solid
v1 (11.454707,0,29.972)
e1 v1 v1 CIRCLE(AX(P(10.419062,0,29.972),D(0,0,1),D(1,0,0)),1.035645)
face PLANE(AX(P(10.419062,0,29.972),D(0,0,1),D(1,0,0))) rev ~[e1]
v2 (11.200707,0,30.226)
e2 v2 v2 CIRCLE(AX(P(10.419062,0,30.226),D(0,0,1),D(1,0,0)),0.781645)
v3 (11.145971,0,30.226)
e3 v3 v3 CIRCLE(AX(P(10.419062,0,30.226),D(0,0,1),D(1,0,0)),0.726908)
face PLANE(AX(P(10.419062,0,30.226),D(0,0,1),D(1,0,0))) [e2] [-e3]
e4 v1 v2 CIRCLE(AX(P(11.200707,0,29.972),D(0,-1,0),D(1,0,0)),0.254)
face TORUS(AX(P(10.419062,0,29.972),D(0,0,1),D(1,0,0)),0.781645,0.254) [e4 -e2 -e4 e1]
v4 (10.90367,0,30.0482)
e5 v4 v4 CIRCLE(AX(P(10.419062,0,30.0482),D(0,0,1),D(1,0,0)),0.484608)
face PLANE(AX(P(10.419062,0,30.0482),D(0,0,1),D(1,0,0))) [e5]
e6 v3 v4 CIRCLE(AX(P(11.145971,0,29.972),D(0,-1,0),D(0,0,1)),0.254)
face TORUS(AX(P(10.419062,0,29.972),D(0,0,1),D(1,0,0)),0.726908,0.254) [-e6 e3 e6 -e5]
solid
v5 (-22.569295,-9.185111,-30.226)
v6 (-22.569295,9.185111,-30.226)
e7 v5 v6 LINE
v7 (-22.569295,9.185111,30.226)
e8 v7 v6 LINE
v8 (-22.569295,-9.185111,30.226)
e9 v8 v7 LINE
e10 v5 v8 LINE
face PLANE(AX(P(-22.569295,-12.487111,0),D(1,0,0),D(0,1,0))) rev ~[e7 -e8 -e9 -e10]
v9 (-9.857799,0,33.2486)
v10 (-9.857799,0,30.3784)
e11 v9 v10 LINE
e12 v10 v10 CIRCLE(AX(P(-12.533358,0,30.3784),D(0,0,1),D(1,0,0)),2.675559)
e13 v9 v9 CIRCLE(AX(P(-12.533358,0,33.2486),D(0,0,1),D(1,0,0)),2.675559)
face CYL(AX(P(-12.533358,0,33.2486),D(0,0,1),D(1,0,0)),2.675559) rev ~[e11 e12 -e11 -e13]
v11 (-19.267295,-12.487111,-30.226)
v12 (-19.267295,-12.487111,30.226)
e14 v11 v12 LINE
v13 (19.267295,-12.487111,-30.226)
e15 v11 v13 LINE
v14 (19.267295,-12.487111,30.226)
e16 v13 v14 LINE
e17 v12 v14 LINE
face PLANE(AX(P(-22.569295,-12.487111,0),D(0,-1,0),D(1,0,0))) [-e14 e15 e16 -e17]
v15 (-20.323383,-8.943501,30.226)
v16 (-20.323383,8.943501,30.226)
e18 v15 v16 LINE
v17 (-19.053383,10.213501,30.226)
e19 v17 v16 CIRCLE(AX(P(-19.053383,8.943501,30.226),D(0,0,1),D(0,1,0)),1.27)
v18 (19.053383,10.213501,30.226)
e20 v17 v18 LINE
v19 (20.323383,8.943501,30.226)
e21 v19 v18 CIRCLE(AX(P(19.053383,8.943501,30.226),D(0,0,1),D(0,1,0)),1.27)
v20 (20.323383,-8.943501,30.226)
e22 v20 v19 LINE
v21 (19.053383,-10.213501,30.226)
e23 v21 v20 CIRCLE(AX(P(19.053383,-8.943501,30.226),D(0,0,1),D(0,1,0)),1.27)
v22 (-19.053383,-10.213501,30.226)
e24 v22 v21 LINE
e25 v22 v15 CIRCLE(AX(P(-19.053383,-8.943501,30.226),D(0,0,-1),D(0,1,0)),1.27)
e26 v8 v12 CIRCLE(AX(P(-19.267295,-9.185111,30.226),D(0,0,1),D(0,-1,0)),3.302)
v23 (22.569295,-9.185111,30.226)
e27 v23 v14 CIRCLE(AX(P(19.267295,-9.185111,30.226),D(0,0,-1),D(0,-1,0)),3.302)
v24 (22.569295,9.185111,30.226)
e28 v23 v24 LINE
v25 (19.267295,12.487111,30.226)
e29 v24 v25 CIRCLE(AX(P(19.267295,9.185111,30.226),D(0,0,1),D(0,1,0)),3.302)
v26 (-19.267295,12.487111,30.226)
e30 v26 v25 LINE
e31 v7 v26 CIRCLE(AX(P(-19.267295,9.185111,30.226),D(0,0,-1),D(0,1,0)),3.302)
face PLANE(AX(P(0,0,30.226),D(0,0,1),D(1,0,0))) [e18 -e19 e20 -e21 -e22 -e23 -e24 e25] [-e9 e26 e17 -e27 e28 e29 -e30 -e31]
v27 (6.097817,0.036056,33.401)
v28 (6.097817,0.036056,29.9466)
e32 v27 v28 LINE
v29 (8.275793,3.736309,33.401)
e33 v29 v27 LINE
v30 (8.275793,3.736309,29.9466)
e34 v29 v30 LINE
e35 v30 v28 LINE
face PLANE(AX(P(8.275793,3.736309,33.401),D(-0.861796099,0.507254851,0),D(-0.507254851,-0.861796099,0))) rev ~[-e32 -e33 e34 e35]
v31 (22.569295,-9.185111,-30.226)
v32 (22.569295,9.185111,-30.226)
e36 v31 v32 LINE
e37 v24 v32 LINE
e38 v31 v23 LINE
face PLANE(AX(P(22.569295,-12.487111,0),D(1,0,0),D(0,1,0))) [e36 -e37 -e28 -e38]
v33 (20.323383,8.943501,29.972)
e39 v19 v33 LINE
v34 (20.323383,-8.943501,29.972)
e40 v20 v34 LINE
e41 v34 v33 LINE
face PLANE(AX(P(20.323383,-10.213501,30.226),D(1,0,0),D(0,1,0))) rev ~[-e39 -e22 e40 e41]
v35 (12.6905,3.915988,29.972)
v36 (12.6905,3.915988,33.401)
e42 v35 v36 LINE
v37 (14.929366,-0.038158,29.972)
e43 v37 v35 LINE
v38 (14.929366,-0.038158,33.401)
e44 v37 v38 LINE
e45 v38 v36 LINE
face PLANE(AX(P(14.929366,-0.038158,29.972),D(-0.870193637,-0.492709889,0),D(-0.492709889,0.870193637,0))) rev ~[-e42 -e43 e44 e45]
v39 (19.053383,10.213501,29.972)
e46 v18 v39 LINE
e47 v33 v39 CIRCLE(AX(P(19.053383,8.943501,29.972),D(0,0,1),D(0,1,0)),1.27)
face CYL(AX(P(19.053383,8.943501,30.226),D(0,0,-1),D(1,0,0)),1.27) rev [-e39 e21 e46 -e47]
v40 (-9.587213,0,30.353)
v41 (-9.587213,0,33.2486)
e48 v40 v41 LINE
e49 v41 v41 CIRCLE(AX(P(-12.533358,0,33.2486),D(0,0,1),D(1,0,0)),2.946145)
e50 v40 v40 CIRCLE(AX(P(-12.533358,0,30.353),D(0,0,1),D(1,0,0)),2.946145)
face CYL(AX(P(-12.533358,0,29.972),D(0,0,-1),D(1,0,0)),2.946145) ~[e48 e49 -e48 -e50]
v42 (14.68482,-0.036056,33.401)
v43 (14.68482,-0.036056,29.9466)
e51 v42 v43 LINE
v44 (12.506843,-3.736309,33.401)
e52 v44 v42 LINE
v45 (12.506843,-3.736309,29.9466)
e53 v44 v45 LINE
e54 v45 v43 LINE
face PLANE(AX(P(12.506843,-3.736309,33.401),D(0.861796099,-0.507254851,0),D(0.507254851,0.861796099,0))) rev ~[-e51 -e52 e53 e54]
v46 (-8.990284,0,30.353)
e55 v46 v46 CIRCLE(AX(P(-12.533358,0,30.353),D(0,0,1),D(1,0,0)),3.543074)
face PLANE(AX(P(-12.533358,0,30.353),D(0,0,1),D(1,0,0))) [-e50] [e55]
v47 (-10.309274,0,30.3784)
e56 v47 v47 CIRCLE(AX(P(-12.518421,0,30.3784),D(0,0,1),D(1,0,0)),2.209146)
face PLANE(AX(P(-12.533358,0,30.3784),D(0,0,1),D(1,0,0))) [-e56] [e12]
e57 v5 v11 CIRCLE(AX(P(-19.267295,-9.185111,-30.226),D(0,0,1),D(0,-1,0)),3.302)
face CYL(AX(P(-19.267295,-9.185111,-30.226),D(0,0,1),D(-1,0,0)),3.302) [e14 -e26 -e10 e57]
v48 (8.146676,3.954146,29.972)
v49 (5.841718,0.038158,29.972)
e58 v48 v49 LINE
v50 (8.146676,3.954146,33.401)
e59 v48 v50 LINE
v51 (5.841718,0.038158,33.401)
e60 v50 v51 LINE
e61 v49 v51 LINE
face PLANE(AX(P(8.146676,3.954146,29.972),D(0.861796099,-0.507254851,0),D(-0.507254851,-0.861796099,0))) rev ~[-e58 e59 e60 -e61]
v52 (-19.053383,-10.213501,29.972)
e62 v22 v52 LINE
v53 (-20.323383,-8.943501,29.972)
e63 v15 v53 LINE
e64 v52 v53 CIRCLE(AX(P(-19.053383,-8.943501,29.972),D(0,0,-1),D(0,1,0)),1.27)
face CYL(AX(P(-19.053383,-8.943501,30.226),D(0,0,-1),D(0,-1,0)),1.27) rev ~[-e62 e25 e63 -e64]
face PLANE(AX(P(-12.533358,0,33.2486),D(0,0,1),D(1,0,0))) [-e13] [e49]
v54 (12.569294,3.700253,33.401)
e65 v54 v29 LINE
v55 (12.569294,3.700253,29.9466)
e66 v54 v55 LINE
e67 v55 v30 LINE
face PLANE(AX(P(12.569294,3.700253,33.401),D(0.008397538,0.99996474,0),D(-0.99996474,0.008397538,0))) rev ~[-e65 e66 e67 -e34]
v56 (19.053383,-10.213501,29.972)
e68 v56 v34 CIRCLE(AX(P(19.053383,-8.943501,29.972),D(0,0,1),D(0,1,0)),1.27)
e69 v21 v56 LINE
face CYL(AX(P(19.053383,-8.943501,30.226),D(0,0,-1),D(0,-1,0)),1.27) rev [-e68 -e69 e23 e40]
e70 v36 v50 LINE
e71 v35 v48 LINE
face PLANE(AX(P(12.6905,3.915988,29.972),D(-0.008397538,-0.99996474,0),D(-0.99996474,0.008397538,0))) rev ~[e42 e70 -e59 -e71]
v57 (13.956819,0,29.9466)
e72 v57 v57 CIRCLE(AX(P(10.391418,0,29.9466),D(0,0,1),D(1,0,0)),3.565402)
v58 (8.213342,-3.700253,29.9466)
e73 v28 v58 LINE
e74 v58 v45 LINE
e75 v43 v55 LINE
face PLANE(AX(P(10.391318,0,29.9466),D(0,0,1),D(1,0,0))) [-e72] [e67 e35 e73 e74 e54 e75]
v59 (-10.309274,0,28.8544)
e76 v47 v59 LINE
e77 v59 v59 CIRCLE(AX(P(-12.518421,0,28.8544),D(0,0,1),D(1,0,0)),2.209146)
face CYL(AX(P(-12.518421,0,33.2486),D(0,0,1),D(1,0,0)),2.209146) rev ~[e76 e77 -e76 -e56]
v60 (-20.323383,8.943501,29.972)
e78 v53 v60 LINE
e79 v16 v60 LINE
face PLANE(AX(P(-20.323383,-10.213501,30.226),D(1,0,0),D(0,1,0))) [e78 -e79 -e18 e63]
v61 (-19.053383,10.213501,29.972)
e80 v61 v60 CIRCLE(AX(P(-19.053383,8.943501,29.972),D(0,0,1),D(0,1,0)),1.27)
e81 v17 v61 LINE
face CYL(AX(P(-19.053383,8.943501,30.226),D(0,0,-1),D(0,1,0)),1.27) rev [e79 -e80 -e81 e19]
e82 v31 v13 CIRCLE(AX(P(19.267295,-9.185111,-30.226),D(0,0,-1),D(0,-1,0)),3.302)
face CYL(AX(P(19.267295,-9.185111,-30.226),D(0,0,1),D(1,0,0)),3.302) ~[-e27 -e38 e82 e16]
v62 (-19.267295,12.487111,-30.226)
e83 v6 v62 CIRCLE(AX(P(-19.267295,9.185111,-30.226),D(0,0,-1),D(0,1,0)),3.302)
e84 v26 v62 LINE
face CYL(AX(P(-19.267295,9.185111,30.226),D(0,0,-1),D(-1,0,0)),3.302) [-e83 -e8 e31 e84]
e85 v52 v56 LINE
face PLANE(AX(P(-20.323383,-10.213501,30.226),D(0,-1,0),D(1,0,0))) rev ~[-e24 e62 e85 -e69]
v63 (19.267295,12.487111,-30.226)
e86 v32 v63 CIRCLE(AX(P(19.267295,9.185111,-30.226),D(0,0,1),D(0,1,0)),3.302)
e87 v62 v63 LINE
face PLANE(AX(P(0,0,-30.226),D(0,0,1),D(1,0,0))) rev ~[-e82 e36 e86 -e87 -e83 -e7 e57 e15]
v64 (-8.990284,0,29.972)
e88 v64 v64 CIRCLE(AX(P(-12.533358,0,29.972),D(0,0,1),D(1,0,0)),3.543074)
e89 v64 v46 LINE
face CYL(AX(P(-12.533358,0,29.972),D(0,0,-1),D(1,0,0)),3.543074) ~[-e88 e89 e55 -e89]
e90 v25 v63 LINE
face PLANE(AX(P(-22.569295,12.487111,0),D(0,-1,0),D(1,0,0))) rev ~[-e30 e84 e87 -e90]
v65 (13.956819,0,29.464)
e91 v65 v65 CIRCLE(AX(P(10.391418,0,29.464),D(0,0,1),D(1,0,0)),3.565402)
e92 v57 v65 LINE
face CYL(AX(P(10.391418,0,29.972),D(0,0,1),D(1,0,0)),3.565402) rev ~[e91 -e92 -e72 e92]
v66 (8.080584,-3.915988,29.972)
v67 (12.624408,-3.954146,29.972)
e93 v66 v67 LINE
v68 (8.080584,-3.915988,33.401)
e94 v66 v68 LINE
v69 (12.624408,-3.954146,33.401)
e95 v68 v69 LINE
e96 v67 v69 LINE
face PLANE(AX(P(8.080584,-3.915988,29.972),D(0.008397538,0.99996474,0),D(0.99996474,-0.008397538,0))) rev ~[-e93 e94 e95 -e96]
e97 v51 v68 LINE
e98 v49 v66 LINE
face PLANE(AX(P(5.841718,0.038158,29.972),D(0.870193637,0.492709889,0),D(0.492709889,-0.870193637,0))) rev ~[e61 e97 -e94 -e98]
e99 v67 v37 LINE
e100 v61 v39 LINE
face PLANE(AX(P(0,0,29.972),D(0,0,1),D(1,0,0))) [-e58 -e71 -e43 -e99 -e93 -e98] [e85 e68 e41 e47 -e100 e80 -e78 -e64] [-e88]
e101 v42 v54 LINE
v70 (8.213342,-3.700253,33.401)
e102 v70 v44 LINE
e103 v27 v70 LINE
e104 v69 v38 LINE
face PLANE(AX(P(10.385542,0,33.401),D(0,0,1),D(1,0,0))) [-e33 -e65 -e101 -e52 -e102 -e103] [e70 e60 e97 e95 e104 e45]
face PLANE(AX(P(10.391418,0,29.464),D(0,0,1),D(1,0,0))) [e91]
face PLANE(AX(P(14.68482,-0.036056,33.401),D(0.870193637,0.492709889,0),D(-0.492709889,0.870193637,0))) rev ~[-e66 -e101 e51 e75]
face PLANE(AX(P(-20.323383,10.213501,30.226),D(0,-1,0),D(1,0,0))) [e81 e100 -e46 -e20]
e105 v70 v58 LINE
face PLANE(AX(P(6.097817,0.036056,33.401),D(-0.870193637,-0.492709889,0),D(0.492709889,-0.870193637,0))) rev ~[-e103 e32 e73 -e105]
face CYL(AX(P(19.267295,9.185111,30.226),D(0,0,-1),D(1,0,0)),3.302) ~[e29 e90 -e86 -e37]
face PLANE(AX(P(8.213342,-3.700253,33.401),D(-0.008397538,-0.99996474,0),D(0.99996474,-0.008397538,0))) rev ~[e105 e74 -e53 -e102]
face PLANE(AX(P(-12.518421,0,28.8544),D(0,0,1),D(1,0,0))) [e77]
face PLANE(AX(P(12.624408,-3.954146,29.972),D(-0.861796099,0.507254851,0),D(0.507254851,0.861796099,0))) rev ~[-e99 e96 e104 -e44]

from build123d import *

# Parameters (mm, degrees)
F0_W      = 45.1385900378
F0_H      = 24.9742213637
F1_DEPTH  = 30.226
F2_R      = 3.302
F3_W      = 40.6467653811
F3_H      = 20.4270016402
F4_DEPTH  = 0.254
F5_R      = 1.27
F6_R      = 2.9461453385
F7_DEPTH  = 3.2766
F6_R_2    = 3.5430744691
F8_DEPTH  = 0.381
F9_DEPTH  = 3.429
F11_DEPTH = 3.4544
F12_R     = 3.565401554
F13_DEPTH = 0.508
F14_R     = 0.4846078425
F15_DEPTH = 0.0762
F14_R_2   = 1.0356451119
F16_DEPTH = 0.254
F18_R     = 2.6755593281
F18_R_2   = 0.8351552506
F19_DEPTH = 2.8702
F20_R     = 2.2091463804
F21_DEPTH = 4.3942


# Not quite as in the source:
# - a fillet or chamfer that OpenCascade refuses, or shapes differently, is made with other operations: its cross-section is extruded or revolved along the edge and cut away or added


with BuildPart() as f1:
    # F0 (on Top) → F1 (new body, symmetric)
    with BuildSketch(Plane.XY):
        Rectangle(F0_W, F0_H)
    extrude(amount=F1_DEPTH, both=True)

    # F2
    f2_edges = [f1.edges().sort_by_distance(p)[0] for p in [
        (-22.569295, -12.487111, 0),
        (-22.569295, 12.487111, 0),
        (22.569295, -12.487111, 0),
        (22.569295, 12.487111, 0),
    ]]
    fillet(f2_edges, radius=F2_R)

    # F3 (on face) → F4 (cut)
    with BuildSketch(Plane.XY.offset(30.226)):
        Rectangle(F3_W, F3_H)
    extrude(amount=-F4_DEPTH, mode=Mode.SUBTRACT)

    # F5
    f5_edges = [f1.edges().sort_by_distance(p)[0] for p in [
        (-20.323383, 10.213501, 30.099),
        (-20.323383, -10.213501, 30.099),
        (20.323383, 10.213501, 30.099),
        (20.323383, -10.213501, 30.099),
    ]]
    fillet(f5_edges, radius=F5_R)

    # F6 (on face) → F7 (join)
    with BuildSketch(Plane.XY.offset(29.972)):
        with Locations((-12.5333582982, 0)):
            Circle(F6_R)
    extrude(amount=F7_DEPTH)

    # F6 (on face) → F8 (join)
    with BuildSketch(Plane.XY.offset(29.972)):
        with Locations((-12.5333582982, 0)):
            Circle(F6_R_2)
        with Locations((-12.5333582982, 0)):
            Circle(F6_R, mode=Mode.SUBTRACT)
    extrude(amount=F8_DEPTH)

    # F6 (on face) → F9 (join)
    with BuildSketch(Plane.XY.offset(29.972)):
        Polygon((12.6905003563, 3.9159879088), (8.1466763174, 3.9541461872), (5.8417182595, 0.0381582783), (8.0805842406, -3.9159879088), (12.6244082795, -3.9541461872), (14.9293663373, -0.0381582783), align=None)
    extrude(amount=F9_DEPTH)

    # F10 (on face) → F11 (cut)
    with BuildSketch(Plane.XY.offset(33.401)):
        Polygon((12.5692944355, 3.700253209), (8.275793058, 3.7363093193), (6.0978168617, 0.0360561103), (8.213342043, -3.700253209), (12.5068434206, -3.7363093193), (14.6848196168, -0.0360561103), align=None)
    extrude(amount=-F11_DEPTH, mode=Mode.SUBTRACT)

    # F12 (on face) → F13 (cut)
    with BuildSketch(Plane.XY.offset(29.972)):
        with Locations((10.3914178908, 0)):
            Circle(F12_R)
    extrude(amount=-F13_DEPTH, mode=Mode.SUBTRACT)

    # F18 (on face) → F19 (cut)
    with BuildSketch(Plane.XY.offset(33.2486)):
        with Locations((-12.5333582982, 0)):
            Circle(F18_R)
        with Locations((-12.5333582982, 0)):
            Circle(F18_R_2, mode=Mode.SUBTRACT)
    extrude(amount=-F19_DEPTH, mode=Mode.SUBTRACT)

    # F20 (on face) → F21 (cut)
    with BuildSketch(Plane.XY.offset(33.2486)):
        with Locations((-12.5184208155, 0)):
            Circle(F20_R)
    extrude(amount=-F21_DEPTH, mode=Mode.SUBTRACT)


with BuildPart() as f15:
    # F14 (on face) → F15 (new body)
    with BuildSketch(Plane.XY.offset(29.972)):
        with Locations((10.4190623388, 0)):
            Circle(F14_R)
    extrude(amount=F15_DEPTH)

    # F14 (on face) → F16 (join)
    with BuildSketch(Plane.XY.offset(29.972)):
        with Locations((10.4190623388, 0)):
            Circle(F14_R_2)
        with Locations((10.4190623388, 0)):
            Circle(F14_R, mode=Mode.SUBTRACT)
    extrude(amount=F16_DEPTH)

    # F17: fillet of radius 0.254 on 2 edges, made by hand

    # F17_s1 → F17_t2 (revolve, cut)
    with BuildSketch(Plane.XZ):
        with BuildLine():
            ThreePointArc((11.4547074506, 29.972), (11.380312573, 30.1516051224), (11.2007074506, 30.226))
            Line((11.2007074506, 30.226), (11.4547074506, 30.226))
            Line((11.4547074506, 30.226), (11.4547074506, 29.972))
        make_face()
    revolve(axis=Axis((10.4190623388, 0, 30.226), (0, 0, 1)), mode=Mode.SUBTRACT)

    # F17_s3 → F17_t4 (revolve, cut)
    with BuildSketch(Plane.XZ):
        with BuildLine():
            ThreePointArc((11.1459707384, 30.226), (10.9957023119, 30.1767813468), (10.9036701812, 30.0482))
            Line((10.9036701812, 30.0482), (10.9036701812, 30.226))
            Line((10.9036701812, 30.226), (11.1459707384, 30.226))
        make_face()
    revolve(axis=Axis((10.4190623388, 0, 30.226), (0, 0, 1)), mode=Mode.SUBTRACT)


solid = Compound([f1.part, f15.part])
